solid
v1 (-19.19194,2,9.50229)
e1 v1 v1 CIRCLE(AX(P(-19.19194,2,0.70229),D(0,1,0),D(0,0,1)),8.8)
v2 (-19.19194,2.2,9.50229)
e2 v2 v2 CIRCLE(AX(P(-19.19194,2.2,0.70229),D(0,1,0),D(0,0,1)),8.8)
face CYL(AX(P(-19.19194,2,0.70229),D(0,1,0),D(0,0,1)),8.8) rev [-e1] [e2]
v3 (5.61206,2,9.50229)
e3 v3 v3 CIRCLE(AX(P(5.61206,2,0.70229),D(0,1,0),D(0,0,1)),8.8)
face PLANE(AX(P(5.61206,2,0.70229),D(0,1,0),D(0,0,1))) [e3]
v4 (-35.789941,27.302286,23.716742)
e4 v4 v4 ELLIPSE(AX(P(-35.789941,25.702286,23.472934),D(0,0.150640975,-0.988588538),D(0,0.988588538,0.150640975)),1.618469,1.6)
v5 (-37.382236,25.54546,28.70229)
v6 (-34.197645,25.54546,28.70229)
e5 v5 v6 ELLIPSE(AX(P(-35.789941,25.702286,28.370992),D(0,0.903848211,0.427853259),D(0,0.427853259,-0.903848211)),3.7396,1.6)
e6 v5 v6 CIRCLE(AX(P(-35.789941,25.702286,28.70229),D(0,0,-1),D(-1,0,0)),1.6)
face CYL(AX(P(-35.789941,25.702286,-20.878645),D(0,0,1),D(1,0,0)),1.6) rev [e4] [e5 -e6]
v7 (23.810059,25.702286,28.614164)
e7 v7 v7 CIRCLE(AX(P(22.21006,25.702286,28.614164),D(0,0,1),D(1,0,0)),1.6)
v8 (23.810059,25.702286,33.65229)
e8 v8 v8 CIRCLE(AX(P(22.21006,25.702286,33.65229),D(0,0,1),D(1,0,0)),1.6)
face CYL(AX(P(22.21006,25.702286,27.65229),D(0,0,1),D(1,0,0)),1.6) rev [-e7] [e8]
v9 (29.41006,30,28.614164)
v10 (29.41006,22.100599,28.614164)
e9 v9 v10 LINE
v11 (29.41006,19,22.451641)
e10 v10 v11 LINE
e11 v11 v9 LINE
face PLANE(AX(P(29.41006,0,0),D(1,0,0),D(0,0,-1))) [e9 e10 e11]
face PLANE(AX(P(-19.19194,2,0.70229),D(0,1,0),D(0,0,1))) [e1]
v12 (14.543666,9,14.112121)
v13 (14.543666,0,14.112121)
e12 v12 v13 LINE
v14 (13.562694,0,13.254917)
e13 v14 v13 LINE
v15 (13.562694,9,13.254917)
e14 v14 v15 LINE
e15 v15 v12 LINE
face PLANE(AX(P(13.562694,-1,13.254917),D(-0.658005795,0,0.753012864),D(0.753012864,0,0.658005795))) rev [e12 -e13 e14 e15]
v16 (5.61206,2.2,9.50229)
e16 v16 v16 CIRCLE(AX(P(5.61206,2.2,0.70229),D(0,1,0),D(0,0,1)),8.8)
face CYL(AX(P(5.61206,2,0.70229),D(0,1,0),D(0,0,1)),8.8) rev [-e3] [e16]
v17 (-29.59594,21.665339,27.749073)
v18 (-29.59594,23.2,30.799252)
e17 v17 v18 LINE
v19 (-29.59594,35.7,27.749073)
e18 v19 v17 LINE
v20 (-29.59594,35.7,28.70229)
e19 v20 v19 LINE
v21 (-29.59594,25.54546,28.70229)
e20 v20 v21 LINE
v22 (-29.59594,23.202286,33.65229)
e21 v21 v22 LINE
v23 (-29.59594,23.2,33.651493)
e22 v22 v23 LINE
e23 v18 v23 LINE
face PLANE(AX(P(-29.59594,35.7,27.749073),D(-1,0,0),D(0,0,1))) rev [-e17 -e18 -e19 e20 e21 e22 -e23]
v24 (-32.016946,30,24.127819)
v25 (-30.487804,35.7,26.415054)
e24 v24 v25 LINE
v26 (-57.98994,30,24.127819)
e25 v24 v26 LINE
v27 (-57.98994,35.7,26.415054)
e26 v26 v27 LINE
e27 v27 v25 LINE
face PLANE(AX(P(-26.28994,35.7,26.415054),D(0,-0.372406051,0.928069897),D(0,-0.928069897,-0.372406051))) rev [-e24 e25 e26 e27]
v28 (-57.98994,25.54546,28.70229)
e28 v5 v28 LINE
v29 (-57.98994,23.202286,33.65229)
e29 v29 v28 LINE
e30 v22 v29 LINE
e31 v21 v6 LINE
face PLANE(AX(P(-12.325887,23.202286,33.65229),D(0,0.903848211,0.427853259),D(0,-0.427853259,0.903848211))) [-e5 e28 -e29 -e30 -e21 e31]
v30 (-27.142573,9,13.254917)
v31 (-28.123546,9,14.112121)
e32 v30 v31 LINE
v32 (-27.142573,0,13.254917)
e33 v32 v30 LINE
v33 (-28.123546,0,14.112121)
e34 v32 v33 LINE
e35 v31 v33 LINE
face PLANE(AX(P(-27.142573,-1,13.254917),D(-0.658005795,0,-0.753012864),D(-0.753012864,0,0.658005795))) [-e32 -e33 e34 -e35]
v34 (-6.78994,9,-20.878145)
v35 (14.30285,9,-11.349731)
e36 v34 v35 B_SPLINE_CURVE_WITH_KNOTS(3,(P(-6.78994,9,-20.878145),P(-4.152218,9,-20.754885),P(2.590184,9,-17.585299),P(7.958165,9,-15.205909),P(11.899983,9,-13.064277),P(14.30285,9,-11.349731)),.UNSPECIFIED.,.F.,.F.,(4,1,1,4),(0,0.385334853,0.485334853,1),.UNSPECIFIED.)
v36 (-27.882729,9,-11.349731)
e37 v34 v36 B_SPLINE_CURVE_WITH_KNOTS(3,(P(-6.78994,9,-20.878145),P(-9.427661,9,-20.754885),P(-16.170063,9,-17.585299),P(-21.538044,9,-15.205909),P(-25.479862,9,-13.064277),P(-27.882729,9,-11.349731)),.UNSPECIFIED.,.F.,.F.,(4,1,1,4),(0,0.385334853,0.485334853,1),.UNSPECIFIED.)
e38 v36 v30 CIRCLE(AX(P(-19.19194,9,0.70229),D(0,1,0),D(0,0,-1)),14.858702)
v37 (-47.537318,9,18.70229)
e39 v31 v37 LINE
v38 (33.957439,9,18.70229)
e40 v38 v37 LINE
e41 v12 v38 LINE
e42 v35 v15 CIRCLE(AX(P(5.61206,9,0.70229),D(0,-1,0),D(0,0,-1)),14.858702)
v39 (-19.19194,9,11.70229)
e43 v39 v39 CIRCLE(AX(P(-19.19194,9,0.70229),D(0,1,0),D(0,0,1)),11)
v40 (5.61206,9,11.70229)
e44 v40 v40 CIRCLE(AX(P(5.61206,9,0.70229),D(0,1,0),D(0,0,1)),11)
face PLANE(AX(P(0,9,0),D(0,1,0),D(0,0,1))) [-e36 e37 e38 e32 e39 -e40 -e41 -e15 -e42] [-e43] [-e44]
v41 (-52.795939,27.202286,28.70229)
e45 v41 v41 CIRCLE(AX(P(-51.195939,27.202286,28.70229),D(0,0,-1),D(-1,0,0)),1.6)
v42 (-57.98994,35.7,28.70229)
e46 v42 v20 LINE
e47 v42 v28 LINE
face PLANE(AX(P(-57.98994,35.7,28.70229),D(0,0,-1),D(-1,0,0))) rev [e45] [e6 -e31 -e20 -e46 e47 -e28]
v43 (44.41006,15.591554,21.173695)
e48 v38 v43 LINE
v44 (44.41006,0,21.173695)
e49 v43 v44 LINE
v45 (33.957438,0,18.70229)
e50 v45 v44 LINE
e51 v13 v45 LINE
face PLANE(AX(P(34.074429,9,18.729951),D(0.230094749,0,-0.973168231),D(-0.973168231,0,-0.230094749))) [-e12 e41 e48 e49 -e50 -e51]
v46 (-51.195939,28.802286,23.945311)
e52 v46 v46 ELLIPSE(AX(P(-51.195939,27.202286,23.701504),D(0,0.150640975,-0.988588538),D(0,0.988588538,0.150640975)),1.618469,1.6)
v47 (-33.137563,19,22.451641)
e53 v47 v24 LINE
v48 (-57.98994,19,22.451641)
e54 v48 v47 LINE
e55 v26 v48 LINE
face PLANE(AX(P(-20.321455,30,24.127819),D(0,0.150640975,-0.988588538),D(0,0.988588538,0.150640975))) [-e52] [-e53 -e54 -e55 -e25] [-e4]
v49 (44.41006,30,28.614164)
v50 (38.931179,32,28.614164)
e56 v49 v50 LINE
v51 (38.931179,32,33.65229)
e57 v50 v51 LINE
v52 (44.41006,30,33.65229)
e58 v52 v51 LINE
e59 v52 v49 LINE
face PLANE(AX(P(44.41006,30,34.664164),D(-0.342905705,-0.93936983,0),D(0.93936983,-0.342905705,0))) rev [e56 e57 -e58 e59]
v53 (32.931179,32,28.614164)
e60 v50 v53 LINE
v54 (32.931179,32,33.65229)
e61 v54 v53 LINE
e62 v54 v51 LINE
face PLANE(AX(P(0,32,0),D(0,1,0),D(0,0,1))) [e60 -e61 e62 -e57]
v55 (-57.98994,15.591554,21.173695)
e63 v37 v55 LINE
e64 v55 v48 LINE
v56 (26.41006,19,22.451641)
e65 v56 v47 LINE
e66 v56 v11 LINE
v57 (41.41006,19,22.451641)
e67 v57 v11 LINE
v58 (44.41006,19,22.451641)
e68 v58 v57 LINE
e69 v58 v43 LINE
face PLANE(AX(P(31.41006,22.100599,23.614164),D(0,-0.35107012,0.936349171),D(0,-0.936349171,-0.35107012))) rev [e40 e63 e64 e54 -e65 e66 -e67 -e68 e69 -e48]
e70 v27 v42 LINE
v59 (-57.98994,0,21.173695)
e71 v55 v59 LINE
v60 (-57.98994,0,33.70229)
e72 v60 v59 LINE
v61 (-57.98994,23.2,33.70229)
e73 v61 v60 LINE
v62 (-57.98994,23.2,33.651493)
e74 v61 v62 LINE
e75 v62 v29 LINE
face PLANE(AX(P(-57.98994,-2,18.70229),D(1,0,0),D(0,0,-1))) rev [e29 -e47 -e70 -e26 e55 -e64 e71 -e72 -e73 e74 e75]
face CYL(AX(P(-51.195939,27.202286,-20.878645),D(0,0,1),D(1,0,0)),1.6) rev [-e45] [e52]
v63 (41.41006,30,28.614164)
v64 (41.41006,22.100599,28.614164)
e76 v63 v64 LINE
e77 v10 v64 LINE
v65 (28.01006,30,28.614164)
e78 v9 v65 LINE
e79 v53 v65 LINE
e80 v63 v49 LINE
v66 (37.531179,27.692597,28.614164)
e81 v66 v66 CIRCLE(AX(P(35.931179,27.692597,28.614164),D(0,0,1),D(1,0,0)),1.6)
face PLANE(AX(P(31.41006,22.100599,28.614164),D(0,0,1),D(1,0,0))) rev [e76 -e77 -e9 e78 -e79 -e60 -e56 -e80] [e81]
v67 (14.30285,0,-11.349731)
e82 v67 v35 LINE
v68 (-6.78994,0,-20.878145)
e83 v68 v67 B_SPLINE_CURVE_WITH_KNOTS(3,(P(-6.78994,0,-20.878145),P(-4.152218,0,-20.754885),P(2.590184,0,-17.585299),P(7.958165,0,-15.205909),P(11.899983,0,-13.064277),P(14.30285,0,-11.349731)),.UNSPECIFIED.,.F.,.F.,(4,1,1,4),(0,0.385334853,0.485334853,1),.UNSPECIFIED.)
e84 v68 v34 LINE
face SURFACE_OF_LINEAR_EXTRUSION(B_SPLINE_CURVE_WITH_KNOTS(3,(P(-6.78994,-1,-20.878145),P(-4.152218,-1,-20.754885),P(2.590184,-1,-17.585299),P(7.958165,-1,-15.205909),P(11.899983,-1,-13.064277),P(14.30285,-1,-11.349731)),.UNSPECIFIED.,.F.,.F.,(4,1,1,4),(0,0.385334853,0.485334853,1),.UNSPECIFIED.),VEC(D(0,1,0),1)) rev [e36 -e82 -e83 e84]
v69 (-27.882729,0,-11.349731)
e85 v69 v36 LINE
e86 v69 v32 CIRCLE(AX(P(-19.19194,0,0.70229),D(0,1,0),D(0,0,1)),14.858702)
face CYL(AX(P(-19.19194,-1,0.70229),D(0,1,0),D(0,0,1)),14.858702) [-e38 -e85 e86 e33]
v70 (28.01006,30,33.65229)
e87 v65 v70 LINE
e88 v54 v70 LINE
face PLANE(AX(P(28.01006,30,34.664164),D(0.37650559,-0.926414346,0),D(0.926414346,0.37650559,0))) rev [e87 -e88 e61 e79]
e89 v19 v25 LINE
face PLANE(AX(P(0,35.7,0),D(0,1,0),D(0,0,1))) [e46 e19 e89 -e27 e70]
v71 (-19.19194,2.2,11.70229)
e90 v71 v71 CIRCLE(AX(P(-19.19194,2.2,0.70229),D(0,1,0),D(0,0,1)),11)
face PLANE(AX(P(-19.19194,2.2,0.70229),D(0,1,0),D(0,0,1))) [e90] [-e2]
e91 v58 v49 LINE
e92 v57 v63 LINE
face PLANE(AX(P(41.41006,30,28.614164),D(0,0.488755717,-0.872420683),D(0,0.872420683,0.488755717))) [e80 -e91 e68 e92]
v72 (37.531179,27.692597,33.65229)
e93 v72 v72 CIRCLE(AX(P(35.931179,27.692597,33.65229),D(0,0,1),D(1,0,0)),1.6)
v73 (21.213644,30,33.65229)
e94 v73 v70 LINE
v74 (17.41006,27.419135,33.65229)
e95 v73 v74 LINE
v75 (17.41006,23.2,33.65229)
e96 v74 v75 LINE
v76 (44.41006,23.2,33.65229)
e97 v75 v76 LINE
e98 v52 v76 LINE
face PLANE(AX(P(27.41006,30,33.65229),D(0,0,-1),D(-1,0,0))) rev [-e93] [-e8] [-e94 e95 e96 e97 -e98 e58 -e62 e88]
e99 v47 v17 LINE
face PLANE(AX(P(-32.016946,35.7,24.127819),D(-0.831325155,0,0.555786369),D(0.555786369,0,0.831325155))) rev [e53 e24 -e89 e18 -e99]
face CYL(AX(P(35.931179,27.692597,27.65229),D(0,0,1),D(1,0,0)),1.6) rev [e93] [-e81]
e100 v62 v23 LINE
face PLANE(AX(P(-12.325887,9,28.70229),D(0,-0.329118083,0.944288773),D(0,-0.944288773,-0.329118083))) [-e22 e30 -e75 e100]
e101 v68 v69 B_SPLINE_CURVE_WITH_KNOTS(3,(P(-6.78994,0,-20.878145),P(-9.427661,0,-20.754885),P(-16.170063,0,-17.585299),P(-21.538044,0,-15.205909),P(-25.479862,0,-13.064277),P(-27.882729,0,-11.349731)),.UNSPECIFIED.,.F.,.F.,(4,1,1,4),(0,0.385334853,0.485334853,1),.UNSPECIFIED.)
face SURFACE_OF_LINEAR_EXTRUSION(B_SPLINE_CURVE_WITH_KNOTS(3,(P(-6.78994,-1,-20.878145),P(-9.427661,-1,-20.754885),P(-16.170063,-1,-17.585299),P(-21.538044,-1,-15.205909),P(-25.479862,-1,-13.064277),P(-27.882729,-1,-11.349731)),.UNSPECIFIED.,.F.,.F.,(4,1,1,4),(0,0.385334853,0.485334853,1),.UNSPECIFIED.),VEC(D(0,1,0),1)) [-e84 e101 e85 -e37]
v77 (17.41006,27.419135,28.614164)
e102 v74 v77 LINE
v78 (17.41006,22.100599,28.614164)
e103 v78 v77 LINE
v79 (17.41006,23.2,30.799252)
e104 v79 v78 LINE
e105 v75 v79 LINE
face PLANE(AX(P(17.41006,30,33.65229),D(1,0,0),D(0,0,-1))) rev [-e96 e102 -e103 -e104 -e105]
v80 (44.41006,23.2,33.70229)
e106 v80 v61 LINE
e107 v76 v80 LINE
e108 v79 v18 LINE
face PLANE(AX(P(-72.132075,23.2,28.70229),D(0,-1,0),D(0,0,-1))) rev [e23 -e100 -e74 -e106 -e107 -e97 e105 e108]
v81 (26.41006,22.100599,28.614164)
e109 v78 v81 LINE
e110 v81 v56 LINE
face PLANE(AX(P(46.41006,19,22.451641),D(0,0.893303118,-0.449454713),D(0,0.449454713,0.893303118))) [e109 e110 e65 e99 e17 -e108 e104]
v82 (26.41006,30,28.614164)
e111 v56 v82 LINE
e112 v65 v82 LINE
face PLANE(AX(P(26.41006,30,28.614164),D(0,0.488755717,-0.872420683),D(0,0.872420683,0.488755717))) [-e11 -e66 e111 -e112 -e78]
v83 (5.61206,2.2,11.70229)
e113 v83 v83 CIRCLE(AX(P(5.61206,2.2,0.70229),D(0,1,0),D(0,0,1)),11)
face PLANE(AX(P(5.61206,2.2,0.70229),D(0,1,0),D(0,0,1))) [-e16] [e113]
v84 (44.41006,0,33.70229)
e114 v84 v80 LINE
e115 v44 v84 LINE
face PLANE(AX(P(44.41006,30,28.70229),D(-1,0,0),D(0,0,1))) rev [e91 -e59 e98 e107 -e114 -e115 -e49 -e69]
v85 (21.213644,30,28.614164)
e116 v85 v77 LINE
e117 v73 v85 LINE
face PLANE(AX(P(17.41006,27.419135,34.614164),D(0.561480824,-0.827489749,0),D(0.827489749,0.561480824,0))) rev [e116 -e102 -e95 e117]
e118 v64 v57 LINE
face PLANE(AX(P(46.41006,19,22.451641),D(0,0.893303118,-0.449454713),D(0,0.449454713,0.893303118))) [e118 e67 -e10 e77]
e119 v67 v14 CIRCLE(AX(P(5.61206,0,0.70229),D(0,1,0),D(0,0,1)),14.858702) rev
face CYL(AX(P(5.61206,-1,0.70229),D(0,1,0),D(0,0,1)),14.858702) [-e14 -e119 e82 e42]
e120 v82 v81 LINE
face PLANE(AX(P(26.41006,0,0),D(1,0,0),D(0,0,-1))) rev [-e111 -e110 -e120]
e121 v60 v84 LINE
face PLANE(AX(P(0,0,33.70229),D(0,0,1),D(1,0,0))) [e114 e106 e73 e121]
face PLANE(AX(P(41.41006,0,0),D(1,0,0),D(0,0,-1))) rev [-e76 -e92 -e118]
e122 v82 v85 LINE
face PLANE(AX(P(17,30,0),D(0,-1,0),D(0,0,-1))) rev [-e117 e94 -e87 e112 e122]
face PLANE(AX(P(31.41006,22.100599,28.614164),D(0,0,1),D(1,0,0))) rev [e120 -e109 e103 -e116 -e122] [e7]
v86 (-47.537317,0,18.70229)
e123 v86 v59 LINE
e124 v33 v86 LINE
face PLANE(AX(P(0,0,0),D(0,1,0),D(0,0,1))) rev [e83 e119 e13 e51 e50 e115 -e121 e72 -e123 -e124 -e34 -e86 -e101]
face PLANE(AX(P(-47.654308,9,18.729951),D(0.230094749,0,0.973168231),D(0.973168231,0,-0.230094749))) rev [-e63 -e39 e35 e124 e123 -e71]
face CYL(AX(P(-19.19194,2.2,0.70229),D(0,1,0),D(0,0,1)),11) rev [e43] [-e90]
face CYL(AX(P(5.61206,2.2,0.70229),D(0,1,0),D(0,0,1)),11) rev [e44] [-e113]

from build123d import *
from build123d.topology import SkipClean

# Parameters (mm, degrees)
SKETCH1_W                = 100
SKETCH1_H                = 50
BOSS_EXTRUDE1_DEPTH      = 9
CUT_EXTRUDE2_DEPTH       = 10
SKETCH6_W                = 120
SKETCH6_H                = 9
BOSS_EXTRUDE2_DEPTH      = 10
SKETCH7_R                = 11.000000016
SKETCH7_R_2              = 10.999999993
CUT_EXTRUDE3_DEPTH       = 6.8
SKETCH8_R                = 8.8
CUT_EXTRUDE4_DEPTH       = 0.2
BOSS_EXTRUDE3_DEPTH      = 21
CUT_EXTRUDE6_DEPTH       = 13
CUT_EXTRUDE7_DEPTH       = 13
LPATTERN1_COUNT          = 2
LPATTERN1_PITCH          = 17
CUT_EXTRUDE8_DEPTH       = 123
SKETCH15_W               = 10
SKETCH15_H               = 7.899400514
CUT_EXTRUDE9_DEPTH       = 5
CUT_EXTRUDE10_DEPTH      = 19
CUT_EXTRUDE10_DEPTH_BACK = 11
MOVE_FACE1_BY            = 5
SKETCH18_W               = 8.8
SKETCH18_H               = 9.911873884
SKETCH18_H_2             = 10
CUT_EXTRUDE11_DEPTH      = 11
SKETCH19_R               = 2.17746248
CUT_EXTRUDE12_DEPTH      = 9
BOSS_EXTRUDE6_DEPTH      = 26.7
CUT_EXTRUDE13_DEPTH      = 31.7
BOSS_EXTRUDE7_REACH      = 106.617
BOSS_EXTRUDE8_REACH      = 115.546
BOSS_EXTRUDE9_REACH      = 115.546
BOSS_EXTRUDE10_DEPTH     = 14.7
BOSS_EXTRUDE11_DEPTH     = 14.7
CUT_EXTRUDE14_DEPTH      = 85.235044064
CUT_EXTRUDE14_DEPTH_BACK = 85.235044064
SKETCH29_R               = 1.599999991
SKETCH29_R_2             = 1.6
MOVE_START               = 27.410060373
MOVE_FACE2_DEPTH         = 7
SKETCH31_W               = 16.4
SKETCH31_H               = 5.038125723
BOSS_EXTRUDE12_DEPTH     = 2
CUT_EXTRUDE16_DEPTH      = 6.05
SKETCH30_R               = 1.6
SKETCH30_R_2             = 1.599999991
CUT_EXTRUDE17_DEPTH      = 6
CUT_EXTRUDE18_DEPTH      = 6
BOSS_EXTRUDE14_DEPTH     = 9
CUT_EXTRUDE19_DEPTH      = 19
BOSS_EXTRUDE15_REACH     = 115.546
SKETCH39_W               = 102.4
SKETCH39_H               = 19
BOSS_EXTRUDE16_DEPTH     = 5
MOVE_START_2             = 27.202290076
MOVE_FACE3_DEPTH         = 1.5
MOVE_START_3             = -57.989939627
MOVE_FACE4_DEPTH         = 102.4
CUT_EXTRUDE21_START      = -5
SKETCH40_R               = 1.6
CUT_EXTRUDE21_DEPTH      = 5
BOSS_EXTRUDE17_DEPTH     = 3
LPATTERN2_COUNT          = 2
LPATTERN2_PITCH          = 15


with BuildPart() as part:
    # Sketch1 → Boss-Extrude1 (new body)
    with BuildSketch(Plane(origin=(0, 0, 0), x_dir=(1, 0, 0), z_dir=(0, 1, 0))):
        with Locations((-4.071246819, 6.297709924)):
            Rectangle(SKETCH1_W, SKETCH1_H)
    extrude(amount=BOSS_EXTRUDE1_DEPTH)

    # Sketch3 → Cut-Extrude2 (cut)
    with BuildSketch(Plane(origin=(0, 9, 0), x_dir=(1, 0, 0), z_dir=(0, 1, 0))):
        with BuildLine():
            Line((13.562694185, -13.254917088), (19.796593595, -18.702290076))
            Line((19.796593595, -18.702290076), (45.928753181, -18.702290076))
            Line((45.928753181, -18.702290076), (45.928753181, 31.297709924))
            Line((45.928753181, 31.297709924), (-6.789939627, 31.297709924))
            Line((-6.789939627, 31.297709924), (-6.789939627, 20.878144865))
            add(Edge.make_bspline(
                [(-6.789939627, 20.878144865), (-4.152217911, 20.754884744), (2.59018392, 17.585299423), (7.958165168, 15.205908702), (11.899983065, 13.0642773), (14.302849715, 11.349730645)],
                knots=[0, 0, 0, 0, 0.385334853, 0.485334853, 1, 1, 1, 1], degree=3))
            ThreePointArc((14.302849715, 11.349730645), (20.46404385, -1.149066549), (13.562694185, -13.254917088))
        make_face()
    cut_extrude2 = extrude(amount=-CUT_EXTRUDE2_DEPTH, mode=Mode.SUBTRACT)

    # Mirror1: Cut-Extrude2 across plane
    add(cut_extrude2.mirror(Plane(origin=(-6.789939627, -1, -31.297709924), x_dir=(0, 0, 1), z_dir=(-1, 0, 0))), mode=Mode.SUBTRACT)

    # Sketch6 → Boss-Extrude2 (add)
    with BuildSketch(Plane.XY.offset(18.702290076)):
        with Locations((-6.789939627, 4.5)):
            Rectangle(SKETCH6_W, SKETCH6_H)
    extrude(amount=BOSS_EXTRUDE2_DEPTH)

    # Sketch7 → Cut-Extrude3 (cut)
    with BuildSketch(Plane(origin=(0, 9, 0), x_dir=(1, 0, 0), z_dir=(0, 1, 0))):
        with Locations(Location((5.612060368, -0.702290075, 0), (0, 0, 270))):
            Circle(SKETCH7_R)
        with Locations(Location((-19.191939622, -0.702289879, 0), (0, 0, 270))):
            Circle(SKETCH7_R_2)
    extrude(amount=-CUT_EXTRUDE3_DEPTH, mode=Mode.SUBTRACT)

    # Sketch8 → Cut-Extrude4 (cut)
    with BuildSketch(Plane(origin=(0, 2.2, 0), x_dir=(1, 0, 0), z_dir=(0, 1, 0))):
        with Locations(Location((5.612060368, -0.702290075, 0), (0, 0, 270))):
            Circle(SKETCH8_R)
        with Locations(Location((-19.191939622, -0.702289879, 0), (0, 0, 270))):
            Circle(SKETCH8_R)
    extrude(amount=-CUT_EXTRUDE4_DEPTH, mode=Mode.SUBTRACT)

    # Sketch9 → Boss-Extrude3 (add)
    with BuildSketch(Plane(origin=(0, 9, 0), x_dir=(1, 0, 0), z_dir=(0, 1, 0))):
        Polygon((27.410060373, -18.702290076), (17.410060373, -18.702290076), (17.410060373, -28.702290076), (17.410060373, -33.652289683), (27.410060373, -33.652289683), (27.410060373, -28.702290076), align=None)
    boss_extrude3 = extrude(amount=BOSS_EXTRUDE3_DEPTH)

    # Sketch10 → Cut-Extrude6 (cut)
    with BuildSketch(Plane(origin=(27.410060373, 0, 0), x_dir=(0, 0, -1), z_dir=(1, 0, 0))):
        Polygon((-28.702290076, 9), (-33.652289683, 22.202285695), (-33.652289683, 9), align=None)
    cut_extrude6 = extrude(amount=-CUT_EXTRUDE6_DEPTH, mode=Mode.SUBTRACT)

    # Sketch11 → Cut-Extrude7 (cut)
    with BuildSketch(Plane(origin=(27.410060373, 0, 0), x_dir=(0, 0, -1), z_dir=(1, 0, 0))):
        Polygon((-18.702290076, 9), (-18.702290076, 22.202285694), (-18.702290076, 30), (-23.61416396, 30), (-23.61416396, 22.100599486), align=None)
    cut_extrude7 = extrude(amount=-CUT_EXTRUDE7_DEPTH, mode=Mode.SUBTRACT)

    # LPattern1: Boss-Extrude3, Cut-Extrude6, Cut-Extrude7 ×2
    with Locations(*[(i * LPATTERN1_PITCH, 0, 0) for i in range(1, LPATTERN1_COUNT)]):
        add(boss_extrude3)
        add(cut_extrude6, mode=Mode.SUBTRACT)
        add(cut_extrude7, mode=Mode.SUBTRACT)

    # Sketch13 → Cut-Extrude8 (cut)
    with BuildSketch(Plane.ZY.offset(66.789939627)):
        Polygon((28.702290076, 9), (27.202290076, 0), (28.702290076, 0), align=None)
    extrude(amount=-CUT_EXTRUDE8_DEPTH, mode=Mode.SUBTRACT)

    # Sketch15 → Cut-Extrude9 (cut)
    with BuildSketch(Plane(origin=(0, 0, 23.61416396), x_dir=(-1, 0, 0), z_dir=(0, 0, -1))):
        with Locations((-22.410060373, 26.050299743)):
            Rectangle(SKETCH15_W, SKETCH15_H)
    extrude(amount=-CUT_EXTRUDE9_DEPTH, mode=Mode.SUBTRACT)

    # Sketch17 → Cut-Extrude10 (cut, two sides: drawn at the far end of the back side and taken through both)
    with BuildSketch(Plane(origin=(27.410060373, 0, 0), x_dir=(0, 0, -1), z_dir=(1, 0, 0)).offset(-CUT_EXTRUDE10_DEPTH_BACK)):
        Polygon((-22.451640546, 19), (-28.61416396, 22.100599486), (-23.61416396, 22.100599486), align=None)
    extrude(amount=CUT_EXTRUDE10_DEPTH + CUT_EXTRUDE10_DEPTH_BACK, mode=Mode.SUBTRACT)

    # Move Face1: a face moved inward by 5.0
    extrude(part.faces().sort_by_distance((39.410060373, 26.050299743, 23.61416396))[0], amount=MOVE_FACE1_BY, dir=(0, 0, 1), mode=Mode.SUBTRACT)

    # Sketch18 → Cut-Extrude11 (cut)
    with BuildSketch(Plane(origin=(0, 9, 0), x_dir=(1, 0, 0), z_dir=(0, 1, 0))):
        with Locations((48.810060373, -23.658227018)):
            Rectangle(SKETCH18_W, SKETCH18_H)
        with Locations((-62.389939627, -23.702290076)):
            Rectangle(SKETCH18_W, SKETCH18_H_2)
    extrude(amount=-CUT_EXTRUDE11_DEPTH, mode=Mode.SUBTRACT)

    # Sketch19 → Cut-Extrude12 (cut)
    with BuildSketch(Plane(origin=(44.410060373, 0, 0), x_dir=(0, 0, -1), z_dir=(1, 0, 0))):
        with Locations((-27.846220708, 9.974076114)):
            Circle(SKETCH19_R)
    extrude(amount=CUT_EXTRUDE12_DEPTH, mode=Mode.SUBTRACT)

    # Sketch20 → Boss-Extrude6 (add)
    with BuildSketch(Plane(origin=(0, 9, 0), x_dir=(1, 0, 0), z_dir=(0, 1, 0))):
        Polygon((-57.989939627, -24.127818916), (-57.989939627, -28.702290076), (-29.595939593, -28.702290076), (-29.595939593, -27.749073121), (-32.01694624, -24.127818916), (-33.376472849, -24.127818916), align=None)
    extrude(amount=BOSS_EXTRUDE6_DEPTH)

    # Sketch21 → Cut-Extrude13 (cut)
    with BuildSketch(Plane.ZY.offset(57.989939627)):
        Polygon((26.415054496, 35.7), (24.127818916, 30), (24.127818916, 35.7), align=None)
    extrude(amount=-CUT_EXTRUDE13_DEPTH, mode=Mode.SUBTRACT)

    # Boss-Extrude7: up to this face of the body (flat: up to its plane)
    boss_extrude7_end = Plane(part.part.faces().sort_by_distance((-57.989939627, 14.553310719, 25.176691805))[0])
    # Sketch14 → Boss-Extrude7 (add, up to the picked face)
    with BuildSketch(Plane.ZY.offset(-34.410060373), mode=Mode.PRIVATE) as boss_extrude7_sk1:
        Polygon((18.702290076, 9), (22.451640546, 19), (28.702290076, 19), (28.702290076, 9), align=None)
    boss_extrude7_tool1 = split(extrude(boss_extrude7_sk1.sketch, amount=BOSS_EXTRUDE7_REACH, mode=Mode.PRIVATE), bisect_by=boss_extrude7_end, keep=Keep.BOTH, mode=Mode.PRIVATE)
    add(boss_extrude7_tool1.solids().sort_by(Axis((34.41006, 13.615467, 24.56754), (-1, 0, 0)))[0])

    # Boss-Extrude8: up to this plane
    boss_extrude8_end = Plane(origin=(-32.01694624, 35.7, 24.127818916), z_dir=(-0.8313251545497, 0, 0.5557863685022487))
    # Sketch23 → Boss-Extrude8 (add, up to the surface)
    with BuildSketch(Plane.ZY.offset(57.989939627), mode=Mode.PRIVATE) as boss_extrude8_sk1:
        Polygon((24.127818916, 30), (22.451640546, 19), (24.127818916, 19), align=None)
    boss_extrude8_tool1 = split(extrude(boss_extrude8_sk1.sketch, amount=-BOSS_EXTRUDE8_REACH, mode=Mode.PRIVATE), bisect_by=boss_extrude8_end, keep=Keep.BOTH, mode=Mode.PRIVATE)
    add(boss_extrude8_tool1.solids().sort_by_distance((-57.98994, 22.666667, 23.569093))[0])

    # Boss-Extrude9: up to this face of the body (flat: up to its plane)
    boss_extrude9_end = Plane(part.part.faces().sort_by_distance((17.410060373, 22.058034461, 30.278583338))[0])
    # Sketch24 → Boss-Extrude9 (add, up to the picked face)
    with BuildSketch(Plane(origin=(44.410060373, 0, 0), x_dir=(0, 0, -1), z_dir=(1, 0, 0)), mode=Mode.PRIVATE) as boss_extrude9_sk1:
        Polygon((-27.202290076, 0), (-33.652289683, 22.202285695), (-28.702290076, 9), align=None)
    boss_extrude9_tool1 = split(extrude(boss_extrude9_sk1.sketch, amount=-BOSS_EXTRUDE9_REACH, mode=Mode.PRIVATE), bisect_by=boss_extrude9_end, keep=Keep.BOTH, mode=Mode.PRIVATE)
    add(boss_extrude9_tool1.solids().sort_by(Axis((44.41006, 10.400762, 29.85229), (-1, 0, 0)))[0])

    # Sketch25 → Boss-Extrude10 (add)
    with BuildSketch(Plane(origin=(27.410060373, 0, 0), x_dir=(0, 0, -1), z_dir=(1, 0, 0))):
        Polygon((-28.702290076, 19), (-33.652289683, 22.202285695), (-28.702290076, 9), align=None)
    extrude(amount=BOSS_EXTRUDE10_DEPTH)

    # Sketch26 → Boss-Extrude11 (add)
    with BuildSketch(Plane(origin=(27.410060373, 0, 0), x_dir=(0, 0, -1), z_dir=(1, 0, 0))):
        Polygon((-28.702290076, 19), (-28.652289683, 22.202285695), (-33.652289683, 22.202285695), align=None)
    extrude(amount=BOSS_EXTRUDE11_DEPTH)

    # Sketch29 → Cut-Extrude14 (cut, two sides: drawn at the far end of the back side and taken through both)
    with BuildSketch(Plane.XY.offset(28.702290076).offset(-CUT_EXTRUDE14_DEPTH_BACK)):
        with Locations(Location((-51.195939153, 27.20228574, 0), (0, 0, 90))):
            Circle(SKETCH29_R)
        with Locations(Location((-35.789940507, 25.702285731, 0), (0, 0, 90))):
            Circle(SKETCH29_R_2)
    extrude(amount=CUT_EXTRUDE14_DEPTH + CUT_EXTRUDE14_DEPTH_BACK, mode=Mode.SUBTRACT)

    # Move Face2: read off the stored shape, not the designer's step
    # Move Face2 outline → Move Face2 (add)
    with BuildSketch(Plane.YZ.offset(MOVE_START)):
        Polygon((30, 33.652289683), (22.202285695, 33.652289683), (22.202285695, 28.652289683), (19, 28.702290076), (19, 22.451640546), (22.100599486, 28.61416396), (30, 28.61416396), align=None)
    extrude(amount=MOVE_FACE2_DEPTH)

    # Sketch31 → Boss-Extrude12 (add)
    with BuildSketch(Plane(origin=(0, 30, 0), x_dir=(1, 0, 0), z_dir=(0, 1, 0))):
        with Locations((36.210060373, -31.133226822)):
            Rectangle(SKETCH31_W, SKETCH31_H)
    extrude(amount=BOSS_EXTRUDE12_DEPTH)

    # Sketch32 → Cut-Extrude16 (cut)
    with BuildSketch(Plane(origin=(0, 0, 28.61416396), x_dir=(-1, 0, 0), z_dir=(0, 0, -1))):
        Polygon((-44.410060373, 30), (-44.410060373, 32), (-38.931179059, 32), align=None)
        Polygon((-28.010060373, 30), (-32.931179059, 32), (-28.010060373, 32), align=None)
    extrude(amount=-CUT_EXTRUDE16_DEPTH, mode=Mode.SUBTRACT)

    # Sketch30 → Cut-Extrude17 (cut)
    with BuildSketch(Plane.XY.offset(33.652289683)):
        with Locations((35.931179059, 27.692596899)):
            Circle(SKETCH30_R)
        with Locations((22.210059502, 25.702285697)):
            Circle(SKETCH30_R_2)
    extrude(amount=-CUT_EXTRUDE17_DEPTH, mode=Mode.SUBTRACT)

    # Sketch33 → Cut-Extrude18 (cut)
    with BuildSketch(Plane(origin=(0, 0, 28.61416396), x_dir=(-1, 0, 0), z_dir=(0, 0, -1))):
        Polygon((-17.410060373, 27.419135074), (-21.213644003, 30), (-17.410060373, 30), align=None)
    extrude(amount=-CUT_EXTRUDE18_DEPTH, mode=Mode.SUBTRACT)

    # Sketch35 → Boss-Extrude14 (add)
    with BuildSketch(Plane.XZ):
        Polygon((34.074428928, 18.72995129), (14.543666487, 14.11212085), (18.502510714, 19.900348682), align=None)
    boss_extrude14 = extrude(amount=-BOSS_EXTRUDE14_DEPTH)

    # Mirror2: Boss-Extrude14 across plane
    add(boss_extrude14.mirror(Plane.ZY.offset(6.789939627)))

    # Sketch36 → Cut-Extrude19 (cut)
    with BuildSketch(Plane.XZ):
        Polygon((-45.035004515, 18.110646219), (-63.303865733, 22.430112499), (-62.152837271, 15.954516445), align=None)
    cut_extrude19 = extrude(amount=-CUT_EXTRUDE19_DEPTH, mode=Mode.SUBTRACT)

    # Mirror3: Cut-Extrude19 across plane
    add(cut_extrude19.mirror(Plane.ZY.offset(6.789939627)), mode=Mode.SUBTRACT)

    # Boss-Extrude15: up to this face of the body (flat: up to its plane)
    boss_extrude15_end = Plane(part.part.faces().sort_by_distance((-29.595939593, 27.35, 28.225681599))[0])
    # Sketch38 → Boss-Extrude15 (add, up to the picked face)
    with BuildSketch(Plane.ZY.offset(57.989939627), mode=Mode.PRIVATE) as boss_extrude15_sk1:
        Polygon((33.652289683, 23.202285744), (28.702290076, 25.545459561), (28.702290076, 9), align=None)
    boss_extrude15_tool1 = split(extrude(boss_extrude15_sk1.sketch, amount=-BOSS_EXTRUDE15_REACH, mode=Mode.PRIVATE), bisect_by=boss_extrude15_end, keep=Keep.BOTH, mode=Mode.PRIVATE)
    add(boss_extrude15_tool1.solids().sort_by(Axis((-57.98994, 19.249248, 30.35229), (1, 0, 0)))[0])

    # Sketch39 → Boss-Extrude16 (add)
    with BuildSketch(Plane.XY.offset(28.702290076)):
        with Locations((-6.789939627, 9.5)):
            Rectangle(SKETCH39_W, SKETCH39_H)
    extrude(amount=BOSS_EXTRUDE16_DEPTH)

    # Move Face3: read off the stored shape, not the designer's step
    # Move Face3 outline → Move Face3 (add)
    with BuildSketch(Plane.XY.offset(MOVE_START_2)):
        Polygon((44.410060373, 5.163322569), (17.410060373, 5.163322569), (17.410060373, 9), (-57.989939627, 9), (-57.989939627, 0), (44.410060373, 0), align=None)
    extrude(amount=MOVE_FACE3_DEPTH)

    # Move Face4: read off the stored shape, not the designer's step
    # Move Face4 outline → Move Face4 (add)
    with BuildSketch(Plane.YZ.offset(MOVE_START_3)):
        Polygon((23.2, 33.702290076), (19, 33.702290076), (19, 22.451640546), (23.2, 30.799251533), align=None)
    extrude(amount=MOVE_FACE4_DEPTH)

    # Sketch40 → Cut-Extrude21 (cut)
    with SkipClean():  # the faces are left unmerged after this step: merging them gives an invalid solid
        with BuildSketch(Plane(origin=(0, 0, 28.702290076), x_dir=(-1, 0, 0), z_dir=(0, 0, -1)).offset(CUT_EXTRUDE21_START)):
            with Locations(Location((35.789940507, 25.702285731, 0), (0, 0, 185.624954879))):
                Circle(SKETCH40_R)
        extrude(amount=CUT_EXTRUDE21_DEPTH, mode=Mode.SUBTRACT)

    # Sketch41 → Boss-Extrude17 (add)
    with SkipClean():  # the faces are left unmerged after this step: merging them gives an invalid solid
        with BuildSketch(Plane(origin=(44.410060373, 0, 0), x_dir=(0, 0, -1), z_dir=(1, 0, 0))):
            Polygon((-28.61416396, 30), (-22.451640546, 19), (-28.61416396, 22.100599486), align=None)
        boss_extrude17 = extrude(amount=-BOSS_EXTRUDE17_DEPTH)

    # LPattern2: Boss-Extrude17 ×2
    with SkipClean():  # the faces are left unmerged after this step: merging them gives an invalid solid
        with Locations(*[(-i * LPATTERN2_PITCH, 0, 0) for i in range(1, LPATTERN2_COUNT)]):
            add(boss_extrude17)


solid = part.part
